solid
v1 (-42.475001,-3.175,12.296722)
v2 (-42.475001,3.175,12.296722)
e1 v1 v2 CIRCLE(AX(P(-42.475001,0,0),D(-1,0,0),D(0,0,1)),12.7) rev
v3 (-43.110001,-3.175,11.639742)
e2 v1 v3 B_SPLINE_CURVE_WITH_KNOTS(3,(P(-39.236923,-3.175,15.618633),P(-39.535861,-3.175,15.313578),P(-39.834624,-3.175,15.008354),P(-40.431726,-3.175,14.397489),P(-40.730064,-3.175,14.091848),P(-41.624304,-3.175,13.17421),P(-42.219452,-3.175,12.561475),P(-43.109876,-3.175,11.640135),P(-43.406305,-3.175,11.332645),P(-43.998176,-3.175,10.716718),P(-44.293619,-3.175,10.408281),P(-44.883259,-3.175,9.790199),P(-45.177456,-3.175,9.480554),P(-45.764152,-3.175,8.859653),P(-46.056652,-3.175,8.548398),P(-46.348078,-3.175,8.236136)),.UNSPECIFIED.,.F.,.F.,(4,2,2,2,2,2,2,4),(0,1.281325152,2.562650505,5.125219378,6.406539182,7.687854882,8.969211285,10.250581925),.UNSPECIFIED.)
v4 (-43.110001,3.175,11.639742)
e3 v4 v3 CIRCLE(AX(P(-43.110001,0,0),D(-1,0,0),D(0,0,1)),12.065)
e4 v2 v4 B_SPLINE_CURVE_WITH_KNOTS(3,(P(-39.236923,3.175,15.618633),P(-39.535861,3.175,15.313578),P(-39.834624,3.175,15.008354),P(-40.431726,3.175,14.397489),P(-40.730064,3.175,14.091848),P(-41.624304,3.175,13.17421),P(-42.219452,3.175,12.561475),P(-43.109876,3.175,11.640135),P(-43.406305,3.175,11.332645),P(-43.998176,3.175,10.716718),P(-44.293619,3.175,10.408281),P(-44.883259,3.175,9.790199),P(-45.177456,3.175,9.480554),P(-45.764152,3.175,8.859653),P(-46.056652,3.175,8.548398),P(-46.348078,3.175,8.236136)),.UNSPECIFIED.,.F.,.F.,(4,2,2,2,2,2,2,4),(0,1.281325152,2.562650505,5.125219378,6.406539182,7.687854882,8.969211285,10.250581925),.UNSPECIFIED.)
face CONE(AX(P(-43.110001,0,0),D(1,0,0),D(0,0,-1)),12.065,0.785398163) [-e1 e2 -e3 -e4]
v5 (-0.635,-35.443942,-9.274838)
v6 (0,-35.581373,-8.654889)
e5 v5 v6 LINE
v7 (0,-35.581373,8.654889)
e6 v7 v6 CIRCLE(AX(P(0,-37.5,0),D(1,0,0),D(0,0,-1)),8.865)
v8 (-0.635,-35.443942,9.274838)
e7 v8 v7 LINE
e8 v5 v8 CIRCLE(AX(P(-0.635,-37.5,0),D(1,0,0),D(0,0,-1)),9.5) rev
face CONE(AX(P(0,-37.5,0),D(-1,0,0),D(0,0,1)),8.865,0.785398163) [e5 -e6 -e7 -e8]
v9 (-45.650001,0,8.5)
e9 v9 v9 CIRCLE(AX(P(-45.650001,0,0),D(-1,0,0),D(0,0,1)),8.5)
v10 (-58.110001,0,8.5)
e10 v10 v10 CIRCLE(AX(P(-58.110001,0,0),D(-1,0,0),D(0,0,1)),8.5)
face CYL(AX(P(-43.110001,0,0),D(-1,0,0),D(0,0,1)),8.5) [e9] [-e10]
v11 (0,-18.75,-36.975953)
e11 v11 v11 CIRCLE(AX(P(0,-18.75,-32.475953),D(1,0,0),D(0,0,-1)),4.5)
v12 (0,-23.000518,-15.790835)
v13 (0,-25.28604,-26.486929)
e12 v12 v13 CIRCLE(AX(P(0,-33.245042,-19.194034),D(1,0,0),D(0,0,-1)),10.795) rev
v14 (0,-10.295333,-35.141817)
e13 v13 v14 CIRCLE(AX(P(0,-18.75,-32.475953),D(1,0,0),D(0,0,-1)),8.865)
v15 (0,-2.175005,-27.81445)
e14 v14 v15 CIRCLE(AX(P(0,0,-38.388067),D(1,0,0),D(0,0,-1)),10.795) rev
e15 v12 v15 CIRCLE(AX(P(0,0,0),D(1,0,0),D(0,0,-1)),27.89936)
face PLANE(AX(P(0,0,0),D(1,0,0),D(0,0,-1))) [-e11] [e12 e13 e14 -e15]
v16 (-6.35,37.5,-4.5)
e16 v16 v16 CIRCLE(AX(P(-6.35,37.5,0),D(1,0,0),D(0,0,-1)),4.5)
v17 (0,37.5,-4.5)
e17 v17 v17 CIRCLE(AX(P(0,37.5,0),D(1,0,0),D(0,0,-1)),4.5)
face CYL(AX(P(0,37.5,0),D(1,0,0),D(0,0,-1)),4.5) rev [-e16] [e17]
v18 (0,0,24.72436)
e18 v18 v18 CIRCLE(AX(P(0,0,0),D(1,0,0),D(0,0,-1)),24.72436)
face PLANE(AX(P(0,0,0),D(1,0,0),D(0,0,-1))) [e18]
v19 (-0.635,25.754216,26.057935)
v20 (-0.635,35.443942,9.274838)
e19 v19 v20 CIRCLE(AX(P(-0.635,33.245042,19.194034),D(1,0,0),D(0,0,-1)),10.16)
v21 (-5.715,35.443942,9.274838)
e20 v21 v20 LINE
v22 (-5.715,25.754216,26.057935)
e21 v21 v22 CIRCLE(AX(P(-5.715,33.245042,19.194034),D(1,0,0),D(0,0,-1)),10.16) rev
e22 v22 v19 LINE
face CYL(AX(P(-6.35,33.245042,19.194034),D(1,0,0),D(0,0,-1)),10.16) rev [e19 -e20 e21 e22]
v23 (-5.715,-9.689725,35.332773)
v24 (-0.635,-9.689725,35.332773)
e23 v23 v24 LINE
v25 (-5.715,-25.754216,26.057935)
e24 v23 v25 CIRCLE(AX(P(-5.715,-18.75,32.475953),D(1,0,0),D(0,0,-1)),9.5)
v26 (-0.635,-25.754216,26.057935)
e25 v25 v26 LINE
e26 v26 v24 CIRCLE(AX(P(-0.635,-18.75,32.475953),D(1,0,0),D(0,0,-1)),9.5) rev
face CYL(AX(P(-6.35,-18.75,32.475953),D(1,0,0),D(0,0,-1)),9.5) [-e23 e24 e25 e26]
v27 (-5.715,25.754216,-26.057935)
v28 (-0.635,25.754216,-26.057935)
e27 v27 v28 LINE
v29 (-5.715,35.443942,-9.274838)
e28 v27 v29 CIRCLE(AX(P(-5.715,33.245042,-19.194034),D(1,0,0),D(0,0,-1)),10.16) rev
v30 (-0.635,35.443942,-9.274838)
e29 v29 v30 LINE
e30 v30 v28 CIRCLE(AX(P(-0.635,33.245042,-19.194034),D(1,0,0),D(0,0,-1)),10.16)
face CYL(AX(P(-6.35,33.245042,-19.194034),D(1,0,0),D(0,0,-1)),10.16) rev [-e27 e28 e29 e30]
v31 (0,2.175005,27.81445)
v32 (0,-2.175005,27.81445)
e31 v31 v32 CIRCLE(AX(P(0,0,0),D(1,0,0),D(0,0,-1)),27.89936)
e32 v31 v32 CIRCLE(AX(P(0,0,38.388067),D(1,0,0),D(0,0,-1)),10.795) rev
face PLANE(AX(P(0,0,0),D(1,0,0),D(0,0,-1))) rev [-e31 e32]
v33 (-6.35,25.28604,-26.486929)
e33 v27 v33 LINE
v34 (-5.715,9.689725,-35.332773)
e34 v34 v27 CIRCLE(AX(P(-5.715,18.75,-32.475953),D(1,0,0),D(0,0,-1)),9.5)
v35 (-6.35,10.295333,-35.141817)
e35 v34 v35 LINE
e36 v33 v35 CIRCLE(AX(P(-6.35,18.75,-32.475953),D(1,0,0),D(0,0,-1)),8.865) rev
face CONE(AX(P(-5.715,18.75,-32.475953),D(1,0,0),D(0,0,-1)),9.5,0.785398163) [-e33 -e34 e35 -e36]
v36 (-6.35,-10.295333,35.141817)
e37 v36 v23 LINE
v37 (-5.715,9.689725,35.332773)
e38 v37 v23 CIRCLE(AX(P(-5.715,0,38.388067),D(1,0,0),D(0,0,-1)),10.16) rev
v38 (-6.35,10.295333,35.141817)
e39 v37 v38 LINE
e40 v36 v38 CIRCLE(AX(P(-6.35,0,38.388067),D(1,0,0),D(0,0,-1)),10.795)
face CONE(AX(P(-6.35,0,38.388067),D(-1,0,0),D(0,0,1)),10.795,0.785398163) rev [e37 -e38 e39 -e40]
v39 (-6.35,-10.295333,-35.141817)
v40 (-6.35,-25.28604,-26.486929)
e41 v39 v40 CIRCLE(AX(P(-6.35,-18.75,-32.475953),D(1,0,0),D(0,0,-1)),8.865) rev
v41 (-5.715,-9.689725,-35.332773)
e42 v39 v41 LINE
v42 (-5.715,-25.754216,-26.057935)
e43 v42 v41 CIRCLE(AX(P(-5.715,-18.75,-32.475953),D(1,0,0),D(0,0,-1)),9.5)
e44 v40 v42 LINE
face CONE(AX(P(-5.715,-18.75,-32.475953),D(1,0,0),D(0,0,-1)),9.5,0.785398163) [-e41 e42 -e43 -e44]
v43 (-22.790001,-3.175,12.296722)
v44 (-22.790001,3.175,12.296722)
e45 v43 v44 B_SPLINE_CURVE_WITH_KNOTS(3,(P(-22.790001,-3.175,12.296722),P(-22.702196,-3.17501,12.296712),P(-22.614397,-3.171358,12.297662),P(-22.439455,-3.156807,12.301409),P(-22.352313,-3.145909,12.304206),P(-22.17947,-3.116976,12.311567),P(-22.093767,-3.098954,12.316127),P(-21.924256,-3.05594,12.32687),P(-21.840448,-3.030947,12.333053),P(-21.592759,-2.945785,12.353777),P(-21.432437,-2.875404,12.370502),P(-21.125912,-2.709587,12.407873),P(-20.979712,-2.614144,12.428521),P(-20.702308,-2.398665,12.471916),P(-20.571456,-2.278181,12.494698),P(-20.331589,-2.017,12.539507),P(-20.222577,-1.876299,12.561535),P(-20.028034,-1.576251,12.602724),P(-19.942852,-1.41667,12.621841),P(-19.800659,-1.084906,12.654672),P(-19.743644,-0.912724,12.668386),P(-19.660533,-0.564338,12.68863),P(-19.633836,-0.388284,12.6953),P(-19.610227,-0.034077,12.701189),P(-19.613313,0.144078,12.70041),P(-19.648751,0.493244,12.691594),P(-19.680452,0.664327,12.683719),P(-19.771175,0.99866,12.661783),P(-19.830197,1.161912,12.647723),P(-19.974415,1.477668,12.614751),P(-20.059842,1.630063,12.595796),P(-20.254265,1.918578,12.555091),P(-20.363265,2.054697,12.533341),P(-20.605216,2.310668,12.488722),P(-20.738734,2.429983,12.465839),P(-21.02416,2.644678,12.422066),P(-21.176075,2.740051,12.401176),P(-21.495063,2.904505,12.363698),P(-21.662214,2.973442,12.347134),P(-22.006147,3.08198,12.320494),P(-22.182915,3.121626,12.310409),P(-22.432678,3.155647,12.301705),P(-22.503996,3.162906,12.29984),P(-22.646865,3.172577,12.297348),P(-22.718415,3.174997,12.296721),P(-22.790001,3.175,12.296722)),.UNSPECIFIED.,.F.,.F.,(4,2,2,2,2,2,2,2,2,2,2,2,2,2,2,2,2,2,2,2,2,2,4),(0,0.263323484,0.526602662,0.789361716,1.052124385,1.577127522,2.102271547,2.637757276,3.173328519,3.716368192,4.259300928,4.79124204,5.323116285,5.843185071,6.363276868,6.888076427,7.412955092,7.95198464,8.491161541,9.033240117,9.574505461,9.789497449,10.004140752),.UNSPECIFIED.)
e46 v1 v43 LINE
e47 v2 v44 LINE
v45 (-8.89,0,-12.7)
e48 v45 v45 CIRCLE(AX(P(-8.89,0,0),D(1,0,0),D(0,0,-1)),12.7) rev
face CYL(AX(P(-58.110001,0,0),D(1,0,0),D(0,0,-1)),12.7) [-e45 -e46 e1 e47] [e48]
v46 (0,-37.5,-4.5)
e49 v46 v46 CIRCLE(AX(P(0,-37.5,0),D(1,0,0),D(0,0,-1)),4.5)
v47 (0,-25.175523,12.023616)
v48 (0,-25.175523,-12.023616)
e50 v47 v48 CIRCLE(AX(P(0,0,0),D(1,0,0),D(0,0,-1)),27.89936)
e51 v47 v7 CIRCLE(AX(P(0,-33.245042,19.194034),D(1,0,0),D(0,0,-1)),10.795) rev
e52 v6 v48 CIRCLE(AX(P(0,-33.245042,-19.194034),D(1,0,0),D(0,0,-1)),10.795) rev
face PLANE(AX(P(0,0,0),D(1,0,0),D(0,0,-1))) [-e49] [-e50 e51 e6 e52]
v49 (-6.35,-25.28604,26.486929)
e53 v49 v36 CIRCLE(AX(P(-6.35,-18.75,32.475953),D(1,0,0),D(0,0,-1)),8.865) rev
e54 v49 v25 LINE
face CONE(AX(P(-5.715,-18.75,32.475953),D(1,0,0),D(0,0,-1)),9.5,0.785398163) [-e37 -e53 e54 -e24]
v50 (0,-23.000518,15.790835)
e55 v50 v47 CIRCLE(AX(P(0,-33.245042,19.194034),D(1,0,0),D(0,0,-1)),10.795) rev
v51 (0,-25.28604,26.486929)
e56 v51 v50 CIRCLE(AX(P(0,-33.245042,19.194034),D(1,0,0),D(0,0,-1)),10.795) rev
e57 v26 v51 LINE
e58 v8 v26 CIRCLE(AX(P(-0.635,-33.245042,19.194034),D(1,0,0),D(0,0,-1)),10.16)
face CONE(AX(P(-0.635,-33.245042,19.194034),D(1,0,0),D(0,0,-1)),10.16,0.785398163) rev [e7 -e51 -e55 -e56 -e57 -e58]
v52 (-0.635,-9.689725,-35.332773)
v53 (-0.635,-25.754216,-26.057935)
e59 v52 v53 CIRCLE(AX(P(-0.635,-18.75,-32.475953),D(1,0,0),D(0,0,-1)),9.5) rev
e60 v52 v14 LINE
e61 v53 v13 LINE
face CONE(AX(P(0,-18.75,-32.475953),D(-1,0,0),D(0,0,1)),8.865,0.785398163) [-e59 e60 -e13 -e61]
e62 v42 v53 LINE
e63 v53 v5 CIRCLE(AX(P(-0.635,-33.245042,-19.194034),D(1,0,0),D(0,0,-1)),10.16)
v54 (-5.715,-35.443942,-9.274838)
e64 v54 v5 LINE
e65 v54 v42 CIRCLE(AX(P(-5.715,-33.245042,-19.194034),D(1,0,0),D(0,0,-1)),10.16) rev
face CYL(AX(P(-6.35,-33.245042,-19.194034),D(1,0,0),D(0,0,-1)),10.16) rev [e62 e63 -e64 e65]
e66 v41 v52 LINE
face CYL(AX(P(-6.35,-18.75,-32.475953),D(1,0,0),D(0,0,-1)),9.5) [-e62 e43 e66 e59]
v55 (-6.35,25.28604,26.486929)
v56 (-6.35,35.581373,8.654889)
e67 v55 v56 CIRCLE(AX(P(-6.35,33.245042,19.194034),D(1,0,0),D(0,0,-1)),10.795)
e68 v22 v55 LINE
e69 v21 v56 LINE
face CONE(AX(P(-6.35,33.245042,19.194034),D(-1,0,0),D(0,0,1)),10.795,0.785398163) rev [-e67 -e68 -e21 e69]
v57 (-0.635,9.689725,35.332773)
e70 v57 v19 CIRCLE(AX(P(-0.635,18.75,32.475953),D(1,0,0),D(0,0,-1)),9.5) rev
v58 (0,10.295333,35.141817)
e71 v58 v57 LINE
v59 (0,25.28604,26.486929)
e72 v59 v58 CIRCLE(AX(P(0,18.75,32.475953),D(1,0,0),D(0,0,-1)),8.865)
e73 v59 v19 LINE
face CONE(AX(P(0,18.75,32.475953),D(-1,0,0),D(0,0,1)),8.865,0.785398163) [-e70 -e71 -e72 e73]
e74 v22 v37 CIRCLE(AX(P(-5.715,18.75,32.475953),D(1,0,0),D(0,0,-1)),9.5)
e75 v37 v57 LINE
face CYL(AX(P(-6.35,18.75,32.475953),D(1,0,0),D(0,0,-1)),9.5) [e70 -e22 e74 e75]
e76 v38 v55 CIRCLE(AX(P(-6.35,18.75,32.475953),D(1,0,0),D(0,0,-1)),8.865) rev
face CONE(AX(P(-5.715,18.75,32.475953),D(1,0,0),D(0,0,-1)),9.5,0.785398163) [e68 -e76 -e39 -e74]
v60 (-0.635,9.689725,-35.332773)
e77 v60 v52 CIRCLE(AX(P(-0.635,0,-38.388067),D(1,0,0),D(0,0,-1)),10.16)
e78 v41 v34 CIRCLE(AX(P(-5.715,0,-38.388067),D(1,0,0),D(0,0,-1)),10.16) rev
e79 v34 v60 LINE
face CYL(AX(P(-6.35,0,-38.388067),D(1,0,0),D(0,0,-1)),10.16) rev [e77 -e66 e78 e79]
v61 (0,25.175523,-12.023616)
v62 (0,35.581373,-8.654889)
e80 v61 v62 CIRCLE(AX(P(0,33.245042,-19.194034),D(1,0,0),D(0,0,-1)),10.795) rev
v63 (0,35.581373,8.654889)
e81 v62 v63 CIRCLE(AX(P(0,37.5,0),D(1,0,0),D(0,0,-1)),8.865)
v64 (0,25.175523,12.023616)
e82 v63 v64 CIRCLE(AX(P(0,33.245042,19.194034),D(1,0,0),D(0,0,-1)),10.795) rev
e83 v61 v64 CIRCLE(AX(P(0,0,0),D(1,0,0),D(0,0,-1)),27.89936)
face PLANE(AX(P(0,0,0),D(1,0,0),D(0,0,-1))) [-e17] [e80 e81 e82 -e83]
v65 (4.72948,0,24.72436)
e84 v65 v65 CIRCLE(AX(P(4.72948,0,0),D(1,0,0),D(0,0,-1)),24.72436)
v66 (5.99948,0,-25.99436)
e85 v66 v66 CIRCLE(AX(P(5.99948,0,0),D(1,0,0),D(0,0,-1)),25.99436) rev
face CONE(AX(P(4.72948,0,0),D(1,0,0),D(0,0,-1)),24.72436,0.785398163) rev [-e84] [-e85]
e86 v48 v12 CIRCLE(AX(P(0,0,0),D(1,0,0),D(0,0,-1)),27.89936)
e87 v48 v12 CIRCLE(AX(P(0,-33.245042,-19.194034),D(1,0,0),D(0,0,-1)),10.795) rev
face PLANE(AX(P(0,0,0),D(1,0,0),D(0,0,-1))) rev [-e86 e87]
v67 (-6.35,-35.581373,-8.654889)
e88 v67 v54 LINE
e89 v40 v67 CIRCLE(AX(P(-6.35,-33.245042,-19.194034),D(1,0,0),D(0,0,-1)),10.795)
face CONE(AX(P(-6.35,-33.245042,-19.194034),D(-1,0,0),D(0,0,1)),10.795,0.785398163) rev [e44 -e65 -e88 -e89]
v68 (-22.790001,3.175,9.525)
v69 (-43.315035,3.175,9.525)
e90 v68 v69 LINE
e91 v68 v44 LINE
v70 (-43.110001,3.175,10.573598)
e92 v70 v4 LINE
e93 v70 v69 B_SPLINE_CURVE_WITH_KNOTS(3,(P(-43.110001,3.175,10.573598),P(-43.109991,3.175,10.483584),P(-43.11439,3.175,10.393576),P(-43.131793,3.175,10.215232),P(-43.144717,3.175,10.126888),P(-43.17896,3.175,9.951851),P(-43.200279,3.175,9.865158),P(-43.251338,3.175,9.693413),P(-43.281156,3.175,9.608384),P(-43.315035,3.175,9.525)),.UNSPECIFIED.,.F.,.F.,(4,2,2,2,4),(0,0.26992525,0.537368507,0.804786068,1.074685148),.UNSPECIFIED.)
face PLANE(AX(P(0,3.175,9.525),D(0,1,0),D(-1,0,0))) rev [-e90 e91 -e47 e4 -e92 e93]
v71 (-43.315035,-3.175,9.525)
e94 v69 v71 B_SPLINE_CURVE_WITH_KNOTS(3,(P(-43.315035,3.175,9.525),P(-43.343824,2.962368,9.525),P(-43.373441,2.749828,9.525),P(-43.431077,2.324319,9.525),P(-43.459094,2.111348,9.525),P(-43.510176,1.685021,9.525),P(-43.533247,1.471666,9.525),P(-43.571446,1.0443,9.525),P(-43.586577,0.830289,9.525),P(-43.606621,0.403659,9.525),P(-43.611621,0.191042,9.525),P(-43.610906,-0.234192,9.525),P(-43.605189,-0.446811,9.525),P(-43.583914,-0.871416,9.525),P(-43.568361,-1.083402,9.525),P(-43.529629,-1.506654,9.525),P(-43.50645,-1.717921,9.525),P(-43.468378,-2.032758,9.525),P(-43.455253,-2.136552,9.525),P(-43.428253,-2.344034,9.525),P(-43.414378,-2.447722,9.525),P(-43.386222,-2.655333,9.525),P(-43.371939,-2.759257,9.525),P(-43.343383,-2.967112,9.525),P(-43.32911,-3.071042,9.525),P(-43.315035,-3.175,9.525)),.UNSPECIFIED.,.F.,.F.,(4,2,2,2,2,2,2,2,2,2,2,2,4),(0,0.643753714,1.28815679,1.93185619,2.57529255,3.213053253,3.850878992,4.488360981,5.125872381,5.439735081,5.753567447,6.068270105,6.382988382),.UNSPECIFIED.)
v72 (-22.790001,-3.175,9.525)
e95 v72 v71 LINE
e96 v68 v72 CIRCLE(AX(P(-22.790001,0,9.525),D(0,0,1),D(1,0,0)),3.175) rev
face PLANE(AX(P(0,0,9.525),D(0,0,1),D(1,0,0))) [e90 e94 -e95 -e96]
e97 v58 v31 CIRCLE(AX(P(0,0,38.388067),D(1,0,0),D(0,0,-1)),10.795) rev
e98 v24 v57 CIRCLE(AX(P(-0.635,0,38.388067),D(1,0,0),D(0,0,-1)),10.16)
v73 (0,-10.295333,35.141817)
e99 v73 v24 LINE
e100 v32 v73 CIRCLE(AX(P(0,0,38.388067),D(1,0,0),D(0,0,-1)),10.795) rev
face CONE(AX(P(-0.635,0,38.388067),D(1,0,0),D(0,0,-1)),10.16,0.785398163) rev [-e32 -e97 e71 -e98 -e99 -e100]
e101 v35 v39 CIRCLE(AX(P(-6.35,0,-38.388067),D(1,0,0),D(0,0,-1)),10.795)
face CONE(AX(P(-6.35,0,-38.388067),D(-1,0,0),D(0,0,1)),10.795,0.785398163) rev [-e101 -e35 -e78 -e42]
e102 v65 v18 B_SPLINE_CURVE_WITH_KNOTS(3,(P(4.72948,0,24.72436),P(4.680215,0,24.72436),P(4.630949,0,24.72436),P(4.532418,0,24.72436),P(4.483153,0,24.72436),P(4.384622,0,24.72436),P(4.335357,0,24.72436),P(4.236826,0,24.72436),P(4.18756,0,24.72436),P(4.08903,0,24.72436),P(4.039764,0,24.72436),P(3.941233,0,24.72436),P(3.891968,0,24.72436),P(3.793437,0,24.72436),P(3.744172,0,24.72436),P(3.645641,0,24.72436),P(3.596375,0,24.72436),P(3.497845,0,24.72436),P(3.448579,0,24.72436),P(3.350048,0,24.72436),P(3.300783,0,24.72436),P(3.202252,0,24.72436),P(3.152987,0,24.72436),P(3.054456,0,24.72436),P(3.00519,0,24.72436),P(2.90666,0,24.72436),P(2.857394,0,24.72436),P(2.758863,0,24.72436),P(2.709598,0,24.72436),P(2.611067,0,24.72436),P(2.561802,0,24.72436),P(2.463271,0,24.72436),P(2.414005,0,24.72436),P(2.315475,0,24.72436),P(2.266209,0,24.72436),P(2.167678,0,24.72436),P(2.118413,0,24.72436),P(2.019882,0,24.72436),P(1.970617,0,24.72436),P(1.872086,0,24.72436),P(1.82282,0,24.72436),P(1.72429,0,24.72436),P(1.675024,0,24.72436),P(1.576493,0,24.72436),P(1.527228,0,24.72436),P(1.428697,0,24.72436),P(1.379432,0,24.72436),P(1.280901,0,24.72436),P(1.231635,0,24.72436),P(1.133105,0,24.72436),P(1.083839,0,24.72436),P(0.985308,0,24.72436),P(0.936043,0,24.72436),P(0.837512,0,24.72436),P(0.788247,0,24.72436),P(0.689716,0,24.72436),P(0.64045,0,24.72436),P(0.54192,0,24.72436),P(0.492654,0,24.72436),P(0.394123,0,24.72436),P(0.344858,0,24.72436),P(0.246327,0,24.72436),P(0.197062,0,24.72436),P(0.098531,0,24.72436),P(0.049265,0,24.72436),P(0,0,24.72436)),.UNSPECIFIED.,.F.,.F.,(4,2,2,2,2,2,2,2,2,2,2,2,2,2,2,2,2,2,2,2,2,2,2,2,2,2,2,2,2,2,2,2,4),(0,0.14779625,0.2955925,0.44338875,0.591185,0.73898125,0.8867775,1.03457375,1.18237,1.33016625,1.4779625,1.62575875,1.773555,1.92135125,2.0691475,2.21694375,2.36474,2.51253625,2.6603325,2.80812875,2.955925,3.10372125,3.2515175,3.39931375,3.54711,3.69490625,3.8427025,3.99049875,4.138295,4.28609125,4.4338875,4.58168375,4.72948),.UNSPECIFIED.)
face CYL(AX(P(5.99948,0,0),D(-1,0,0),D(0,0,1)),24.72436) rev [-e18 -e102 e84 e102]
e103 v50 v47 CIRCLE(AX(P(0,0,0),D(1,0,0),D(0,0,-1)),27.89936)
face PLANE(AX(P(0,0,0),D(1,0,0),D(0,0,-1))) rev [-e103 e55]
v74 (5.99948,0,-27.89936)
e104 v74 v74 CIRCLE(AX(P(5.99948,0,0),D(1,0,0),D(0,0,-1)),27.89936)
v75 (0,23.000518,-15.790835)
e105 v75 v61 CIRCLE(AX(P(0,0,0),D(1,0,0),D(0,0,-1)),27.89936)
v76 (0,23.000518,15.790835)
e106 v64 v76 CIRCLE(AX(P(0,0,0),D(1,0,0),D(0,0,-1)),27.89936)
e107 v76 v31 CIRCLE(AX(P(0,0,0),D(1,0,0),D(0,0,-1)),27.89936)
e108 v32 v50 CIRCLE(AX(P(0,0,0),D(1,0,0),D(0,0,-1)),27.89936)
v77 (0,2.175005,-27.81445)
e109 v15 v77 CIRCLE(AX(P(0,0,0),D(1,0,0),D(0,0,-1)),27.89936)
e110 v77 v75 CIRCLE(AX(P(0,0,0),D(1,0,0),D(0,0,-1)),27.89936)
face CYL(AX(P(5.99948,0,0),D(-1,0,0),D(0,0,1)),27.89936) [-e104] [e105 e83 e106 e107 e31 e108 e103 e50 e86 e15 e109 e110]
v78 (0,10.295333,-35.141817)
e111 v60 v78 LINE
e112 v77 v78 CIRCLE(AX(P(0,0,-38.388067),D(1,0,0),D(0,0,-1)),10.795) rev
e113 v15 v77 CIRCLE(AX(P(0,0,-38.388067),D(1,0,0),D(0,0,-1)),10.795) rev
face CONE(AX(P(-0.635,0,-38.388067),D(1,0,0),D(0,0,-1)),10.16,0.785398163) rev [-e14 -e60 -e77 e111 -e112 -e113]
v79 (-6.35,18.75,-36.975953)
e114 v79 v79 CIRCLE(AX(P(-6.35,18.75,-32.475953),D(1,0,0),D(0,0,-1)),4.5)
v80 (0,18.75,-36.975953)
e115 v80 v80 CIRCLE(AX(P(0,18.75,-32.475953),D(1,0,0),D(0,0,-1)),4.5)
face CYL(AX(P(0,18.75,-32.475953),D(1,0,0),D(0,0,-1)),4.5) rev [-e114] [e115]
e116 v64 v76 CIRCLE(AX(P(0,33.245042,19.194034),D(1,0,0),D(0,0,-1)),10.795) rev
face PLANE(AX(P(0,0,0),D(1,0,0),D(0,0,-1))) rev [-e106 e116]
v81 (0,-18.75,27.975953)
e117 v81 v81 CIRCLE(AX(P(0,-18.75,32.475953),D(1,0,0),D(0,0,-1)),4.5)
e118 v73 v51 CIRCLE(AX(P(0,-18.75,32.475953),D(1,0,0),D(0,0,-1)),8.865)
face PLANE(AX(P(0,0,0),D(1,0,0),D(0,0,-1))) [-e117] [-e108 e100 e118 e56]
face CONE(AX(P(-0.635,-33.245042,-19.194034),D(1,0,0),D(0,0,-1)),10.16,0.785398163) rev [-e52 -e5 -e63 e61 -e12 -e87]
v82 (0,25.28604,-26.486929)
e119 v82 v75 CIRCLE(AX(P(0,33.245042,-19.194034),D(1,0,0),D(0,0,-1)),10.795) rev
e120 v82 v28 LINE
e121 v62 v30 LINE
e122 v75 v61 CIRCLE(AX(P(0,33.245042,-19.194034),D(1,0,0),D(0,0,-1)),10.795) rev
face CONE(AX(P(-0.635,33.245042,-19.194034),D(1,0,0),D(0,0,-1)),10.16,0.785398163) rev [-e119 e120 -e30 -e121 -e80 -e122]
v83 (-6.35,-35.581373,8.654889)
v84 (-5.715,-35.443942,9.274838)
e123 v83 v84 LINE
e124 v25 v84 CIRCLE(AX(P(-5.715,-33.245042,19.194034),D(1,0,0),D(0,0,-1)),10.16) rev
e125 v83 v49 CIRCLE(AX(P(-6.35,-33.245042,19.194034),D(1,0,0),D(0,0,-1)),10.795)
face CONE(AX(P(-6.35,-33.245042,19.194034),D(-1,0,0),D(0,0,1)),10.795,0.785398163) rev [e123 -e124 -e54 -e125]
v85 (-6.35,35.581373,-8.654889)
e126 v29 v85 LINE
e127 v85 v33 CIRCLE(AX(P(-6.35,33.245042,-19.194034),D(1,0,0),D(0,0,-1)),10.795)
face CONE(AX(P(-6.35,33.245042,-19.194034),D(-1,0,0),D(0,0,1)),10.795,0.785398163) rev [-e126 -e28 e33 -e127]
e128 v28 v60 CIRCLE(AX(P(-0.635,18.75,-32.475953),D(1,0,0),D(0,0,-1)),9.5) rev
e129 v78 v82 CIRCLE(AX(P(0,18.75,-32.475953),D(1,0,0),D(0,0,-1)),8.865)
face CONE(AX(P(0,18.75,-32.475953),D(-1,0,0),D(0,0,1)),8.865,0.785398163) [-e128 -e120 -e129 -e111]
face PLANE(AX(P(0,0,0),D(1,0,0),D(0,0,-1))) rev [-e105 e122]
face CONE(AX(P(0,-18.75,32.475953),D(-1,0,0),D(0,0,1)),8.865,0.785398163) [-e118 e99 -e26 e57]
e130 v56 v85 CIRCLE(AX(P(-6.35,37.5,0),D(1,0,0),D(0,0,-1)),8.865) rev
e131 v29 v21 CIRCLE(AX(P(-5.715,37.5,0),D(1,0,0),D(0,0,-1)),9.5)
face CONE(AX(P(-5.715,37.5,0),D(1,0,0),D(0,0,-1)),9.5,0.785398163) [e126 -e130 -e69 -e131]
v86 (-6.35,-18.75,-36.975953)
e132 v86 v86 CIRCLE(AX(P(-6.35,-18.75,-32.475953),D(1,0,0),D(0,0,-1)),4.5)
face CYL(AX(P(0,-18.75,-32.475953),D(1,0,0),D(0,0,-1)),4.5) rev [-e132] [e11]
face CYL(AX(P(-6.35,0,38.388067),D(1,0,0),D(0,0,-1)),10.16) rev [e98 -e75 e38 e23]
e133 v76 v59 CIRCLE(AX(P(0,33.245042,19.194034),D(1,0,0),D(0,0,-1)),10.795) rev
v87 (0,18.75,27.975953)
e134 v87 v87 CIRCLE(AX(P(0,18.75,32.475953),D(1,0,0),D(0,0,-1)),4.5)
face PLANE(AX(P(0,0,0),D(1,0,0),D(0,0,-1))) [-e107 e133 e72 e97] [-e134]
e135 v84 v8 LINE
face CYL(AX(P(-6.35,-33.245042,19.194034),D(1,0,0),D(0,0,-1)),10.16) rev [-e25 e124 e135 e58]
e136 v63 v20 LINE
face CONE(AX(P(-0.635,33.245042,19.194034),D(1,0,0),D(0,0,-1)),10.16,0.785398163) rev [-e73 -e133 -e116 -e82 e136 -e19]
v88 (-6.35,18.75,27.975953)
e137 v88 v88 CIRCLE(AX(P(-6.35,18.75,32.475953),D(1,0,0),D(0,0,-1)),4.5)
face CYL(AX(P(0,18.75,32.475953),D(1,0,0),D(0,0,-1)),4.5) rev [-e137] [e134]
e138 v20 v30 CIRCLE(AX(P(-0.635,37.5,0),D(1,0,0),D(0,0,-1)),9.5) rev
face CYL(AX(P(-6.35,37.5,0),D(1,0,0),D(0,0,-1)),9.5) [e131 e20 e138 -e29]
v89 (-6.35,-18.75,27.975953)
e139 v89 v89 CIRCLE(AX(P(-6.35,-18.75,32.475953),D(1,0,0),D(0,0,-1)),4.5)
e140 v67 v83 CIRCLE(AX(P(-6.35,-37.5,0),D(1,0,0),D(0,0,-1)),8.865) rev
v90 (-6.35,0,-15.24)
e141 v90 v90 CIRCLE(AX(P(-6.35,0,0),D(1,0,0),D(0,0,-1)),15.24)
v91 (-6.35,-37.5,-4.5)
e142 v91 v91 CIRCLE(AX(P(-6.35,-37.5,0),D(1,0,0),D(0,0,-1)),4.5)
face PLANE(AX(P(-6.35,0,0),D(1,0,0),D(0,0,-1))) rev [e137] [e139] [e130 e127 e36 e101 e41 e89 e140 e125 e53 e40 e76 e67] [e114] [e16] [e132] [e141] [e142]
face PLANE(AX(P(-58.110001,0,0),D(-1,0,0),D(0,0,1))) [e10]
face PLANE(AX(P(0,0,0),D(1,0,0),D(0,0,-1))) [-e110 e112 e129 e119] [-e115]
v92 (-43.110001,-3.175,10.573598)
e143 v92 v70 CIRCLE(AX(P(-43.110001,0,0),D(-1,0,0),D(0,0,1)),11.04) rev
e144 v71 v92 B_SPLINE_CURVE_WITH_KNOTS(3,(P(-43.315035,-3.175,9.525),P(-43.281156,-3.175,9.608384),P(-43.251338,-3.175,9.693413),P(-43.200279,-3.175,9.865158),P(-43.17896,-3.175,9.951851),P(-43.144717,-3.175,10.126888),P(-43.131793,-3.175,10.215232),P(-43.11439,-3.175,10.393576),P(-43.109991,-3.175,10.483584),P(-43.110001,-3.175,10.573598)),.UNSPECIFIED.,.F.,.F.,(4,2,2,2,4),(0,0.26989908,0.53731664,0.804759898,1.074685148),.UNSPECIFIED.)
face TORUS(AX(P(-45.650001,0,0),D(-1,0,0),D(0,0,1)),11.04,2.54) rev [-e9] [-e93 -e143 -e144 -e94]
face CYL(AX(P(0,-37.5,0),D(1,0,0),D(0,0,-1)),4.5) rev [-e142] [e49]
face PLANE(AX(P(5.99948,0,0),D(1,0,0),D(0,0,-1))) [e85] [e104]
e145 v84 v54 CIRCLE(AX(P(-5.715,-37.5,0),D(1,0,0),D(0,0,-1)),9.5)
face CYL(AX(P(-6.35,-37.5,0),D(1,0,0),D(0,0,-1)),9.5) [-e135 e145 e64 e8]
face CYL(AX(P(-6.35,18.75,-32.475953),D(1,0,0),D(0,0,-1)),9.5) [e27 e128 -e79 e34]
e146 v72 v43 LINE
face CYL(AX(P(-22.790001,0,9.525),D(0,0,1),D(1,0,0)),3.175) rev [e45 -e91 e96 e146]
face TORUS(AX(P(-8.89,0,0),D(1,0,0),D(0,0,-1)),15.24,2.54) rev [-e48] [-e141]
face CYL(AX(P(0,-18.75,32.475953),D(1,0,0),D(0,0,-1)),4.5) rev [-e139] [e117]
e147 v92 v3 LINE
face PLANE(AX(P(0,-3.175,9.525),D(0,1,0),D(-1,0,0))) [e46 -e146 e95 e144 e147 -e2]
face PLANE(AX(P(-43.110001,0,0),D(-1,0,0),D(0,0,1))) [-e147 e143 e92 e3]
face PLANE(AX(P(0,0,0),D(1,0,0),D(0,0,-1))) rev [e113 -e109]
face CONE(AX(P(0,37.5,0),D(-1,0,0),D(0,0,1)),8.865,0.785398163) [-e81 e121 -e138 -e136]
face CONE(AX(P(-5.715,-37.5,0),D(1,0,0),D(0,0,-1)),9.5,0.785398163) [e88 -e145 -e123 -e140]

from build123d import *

# Parameters (mm, degrees)
SKETCH1_R              = 47
BASE_EXTRUDE_DEPTH     = 6.35
M8_CLEARANCE_HOLES_D   = 9
CIRPATTERN_COUNT       = 6
CUT_EXTRUDE_DEPTH      = 67.770670957
CUT_EXTRUDE_DEPTH_BACK = 67.770670957
CHAMFER1_SIZE          = 0.635
SKETCH8_R              = 12.7
SHAFT_EXTRUDE_DEPTH    = 51.76000062
CHAMFER3_SIZE          = 0.635
SHAFT_CHAMFER_SIZE     = 1
SKETCH30_R             = 27.89936
SKETCH30_R_2           = 24.72436
LIP_EXTRUDE_DEPTH      = 5.99948
LIP_CHAMFER_SIZE       = 1.27
CUT_EXTRUDE1_START     = -15
SKETCH45_R             = 12.7
SKETCH45_R_2           = 8.5
CUT_EXTRUDE1_DEPTH     = 15
CHAMFER4_SIZE          = 0.635
FILLET2_R              = 2.54
CUT_EXTRUDE3_DEPTH     = 3.175
FILLET3_R              = 2.54


with BuildPart() as part:
    # Sketch1 → Base-Extrude (new body)
    with BuildSketch(Plane(origin=(0, 0, 0), x_dir=(0, 0, -1), z_dir=(1, 0, 0))):
        Circle(SKETCH1_R)
    extrude(amount=-BASE_EXTRUDE_DEPTH)

    # M8 Clearance Holes (through all)
    with Locations(Plane(origin=(0, 0, 0), x_dir=(0, 0, -1), z_dir=(1, 0, 0))):
        with Locations((0, -37.5)):
            m8_clearance_holes = Hole(M8_CLEARANCE_HOLES_D / 2)

    # CirPattern: M8 Clearance Holes ×6 about axis
    cirpattern_axis = Axis((0, 0, 0), (1, 0, 0))
    for i in range(1, CIRPATTERN_COUNT):
        add(m8_clearance_holes.rotate(cirpattern_axis, i * 360 / CIRPATTERN_COUNT), mode=Mode.SUBTRACT)

    # Sketch19 → Cut-Extrude (cut, two sides: drawn at the far end of the back side and taken through both)
    with BuildSketch(Plane(origin=(0, 0, 0), x_dir=(0, 0, -1), z_dir=(1, 0, 0)).offset(-CUT_EXTRUDE_DEPTH_BACK)):
        with BuildLine():
            ThreePointArc((9.274838239, 35.443941724), (14.114033661, 24.446223401), (26.057934823, 25.754216393))
            ThreePointArc((26.057934823, 25.754216393), (33.921184851, 28.139425108), (40.703194264, 23.499999504))
            ThreePointArc((40.703194264, 23.499999504), (23.500000227, 40.703193847), (-4.7e-08, 47))
            ThreePointArc((-4.7e-08, 47), (7.40886473, 43.446320157), (9.274838239, 35.443941724))
        make_face()
        with BuildLine():
            ThreePointArc((-26.057934823, 25.754216393), (-14.114033661, 24.446223401), (-9.274838239, 35.443941724))
            ThreePointArc((-9.274838239, 35.443941724), (-7.40886476, 43.44632012), (-4.7e-08, 47))
            ThreePointArc((-4.7e-08, 47), (-23.500000787, 40.703193523), (-40.703194863, 23.499998466))
            ThreePointArc((-40.703194863, 23.499998466), (-33.921185443, 28.139425017), (-26.057934823, 25.754216393))
        make_face()
        with BuildLine():
            ThreePointArc((40.703193464, -23.50000089), (47, -8e-07), (40.703194264, 23.499999504))
            ThreePointArc((40.703194264, 23.499999504), (41.33004921, 15.30689472), (35.332773062, 9.689725331))
            ThreePointArc((35.332773062, 9.689725331), (28.228067323, 0), (35.332773062, -9.689725331))
            ThreePointArc((35.332773062, -9.689725331), (41.330049499, -15.306895465), (40.703193464, -23.50000089))
        make_face()
        with BuildLine():
            ThreePointArc((-35.332773062, 9.689725331), (-41.330048992, 15.306894161), (-40.703194863, 23.499998466))
            ThreePointArc((-40.703194863, 23.499998466), (-47, -6.9e-08), (-40.703194794, -23.499998586))
            ThreePointArc((-40.703194794, -23.499998586), (-41.330049018, -15.306894226), (-35.332773062, -9.689725331))
            ThreePointArc((-35.332773062, -9.689725331), (-28.228067323, 0), (-35.332773062, 9.689725331))
        make_face()
        with BuildLine():
            ThreePointArc((-26.057934823, -25.754216393), (-33.921185375, -28.139425028), (-40.703194794, -23.499998586))
            ThreePointArc((-40.703194794, -23.499998586), (-23.500000688, -40.703193581), (4.4e-08, -47))
            ThreePointArc((4.4e-08, -47), (-7.408864732, -43.446320155), (-9.274838239, -35.443941724))
            ThreePointArc((-9.274838239, -35.443941724), (-14.114033661, -24.446223401), (-26.057934823, -25.754216393))
        make_face()
        with BuildLine():
            ThreePointArc((4.4e-08, -47), (23.499999574, -40.703194224), (40.703193464, -23.50000089))
            ThreePointArc((40.703193464, -23.50000089), (33.92118406, -28.13942523), (26.057934823, -25.754216393))
            ThreePointArc((26.057934823, -25.754216393), (14.114033661, -24.446223401), (9.274838239, -35.443941724))
            ThreePointArc((9.274838239, -35.443941724), (7.408864759, -43.446320121), (4.4e-08, -47))
        make_face()
    extrude(amount=CUT_EXTRUDE_DEPTH + CUT_EXTRUDE_DEPTH_BACK, mode=Mode.SUBTRACT)

    # Chamfer1
    chamfer1_edges = [part.edges().sort_by_distance(p)[0] for p in [
        (-6.35, -24.446223401, 14.114033661),
        (-6.35, 24.446223401, -14.114033661),
        (-6.35, 24.446223401, 14.114033661),
        (-6.35, 23.5, 40.703193978),
        (-6.35, 47, 0),
        (-6.35, -24.446223401, -14.114033661),
        (-6.35, -23.5, -40.703193978),
        (-6.35, -47, 0),
        (-6.35, 0, 28.228067323),
        (-6.35, -23.5, 40.703193978),
        (-6.35, 0, -28.228067323),
        (-6.35, 23.5, -40.703193978),
    ]]
    chamfer(chamfer1_edges, length=CHAMFER1_SIZE)

    # Sketch8 → Shaft-Extrude (add)
    with BuildSketch(Plane.ZY.offset(6.35)):
        with Locations(Location((0, 0, 0), (0, 0, 180))):
            Circle(SKETCH8_R)
    extrude(amount=SHAFT_EXTRUDE_DEPTH)

    # Chamfer3
    chamfer3_edges = [part.edges().sort_by_distance(p)[0] for p in [
        (0, 24.446223401, -14.114033661),
        (0, -24.446223401, 14.114033661),
        (0, -24.446223401, -14.114033661),
        (0, -47, 0),
        (0, -23.5, -40.703193978),
        (0, 24.446223401, 14.114033661),
        (0, 47, 0),
        (0, 23.5, 40.703193978),
        (0, 0, -28.228067323),
        (0, 23.5, -40.703193978),
        (0, 0, 28.228067323),
        (0, -23.5, 40.703193978),
    ]]
    chamfer(chamfer3_edges, length=CHAMFER3_SIZE)

    # Shaft Chamfer
    shaft_chamfer_edges = [part.edges().sort_by_distance(p)[0] for p in [
        (-58.11000062, 0, 12.7),
    ]]
    chamfer(shaft_chamfer_edges, length=SHAFT_CHAMFER_SIZE)

    # Sketch30 → Lip Extrude (add)
    with BuildSketch(Plane(origin=(0, 0, 0), x_dir=(0, 0, -1), z_dir=(1, 0, 0))):
        with Locations(Location((0, 0, 0), (0, 0, 175.528743947))):
            Circle(SKETCH30_R)
        with Locations(Location((0, 0, 0), (0, 0, 180))):
            Circle(SKETCH30_R_2, mode=Mode.SUBTRACT)
    extrude(amount=LIP_EXTRUDE_DEPTH)

    # Lip Chamfer
    lip_chamfer_edges = [part.edges().sort_by_distance(p)[0] for p in [
        (5.99948, 0, -24.72436),
    ]]
    chamfer(lip_chamfer_edges, length=LIP_CHAMFER_SIZE)

    # Sketch45 → Cut-Extrude1 (cut)
    with BuildSketch(Plane.ZY.offset(58.11000062).offset(CUT_EXTRUDE1_START)):
        with Locations(Location((0, 0, 0), (0, 0, 180))):
            Circle(SKETCH45_R)
        Circle(SKETCH45_R_2, mode=Mode.SUBTRACT)
    extrude(amount=CUT_EXTRUDE1_DEPTH, mode=Mode.SUBTRACT)

    # Chamfer4
    chamfer4_edges = [part.edges().sort_by_distance(p)[0] for p in [
        (-43.11000062, 0, 12.7),
    ]]
    chamfer(chamfer4_edges, length=CHAMFER4_SIZE)

    # Fillet2
    fillet2_edges = [part.edges().sort_by_distance(p)[0] for p in [
        (-6.35, 0, 12.7),
    ]]
    fillet(fillet2_edges, radius=FILLET2_R)

    # Sketch48 → Cut-Extrude3 (cut)
    with BuildSketch(Plane.XY.offset(12.7)):
        with BuildLine():
            ThreePointArc((-19.61500062, 0), (-20.54493659, 2.24506403), (-22.79000062, 3.175))
            Line((-22.79000062, 3.175), (-43.11000062, 3.175))
            Line((-43.11000062, 3.175), (-43.11000062, 0))
            Line((-43.11000062, 0), (-19.61500062, 0))
        make_face()
        with BuildLine():
            ThreePointArc((-22.79000062, -3.175), (-20.54493659, -2.24506403), (-19.61500062, 0))
            Line((-19.61500062, 0), (-43.11000062, 0))
            Line((-43.11000062, 0), (-43.11000062, -3.175))
            Line((-43.11000062, -3.175), (-22.79000062, -3.175))
        make_face()
    extrude(amount=-CUT_EXTRUDE3_DEPTH, mode=Mode.SUBTRACT)

    # Fillet3
    # the kernel refuses this fillet: 2.54 mm, written as the material it adds along each edge
    with BuildSketch(Plane(origin=(-43.11000062, 0, 0), x_dir=(0, 0, 1), z_dir=(0, -1, 0))) as fillet3_piece_1_section:
        with BuildLine():
            CenterArc((8.5 + FILLET3_R, FILLET3_R), FILLET3_R, 180, 90)
            Line((8.5, FILLET3_R), (8.5, 0))
            Line((8.5, 0), (8.5 + FILLET3_R, 0))
        make_face()
    fillet3_piece_1 = revolve(axis=Axis((-43.11000062, 0, 0), (-1, 0, 0)), mode=Mode.PRIVATE)
    fillet3_piece_1 = split(fillet3_piece_1, bisect_by=Plane(origin=(-43.740743276, 3.41e-07, 9.525), z_dir=(0, 0, -1)), keep=Keep.TOP, mode=Mode.PRIVATE)
    add(fillet3_piece_1)
    with BuildSketch(Plane(origin=(-43.11000062, 0, 0), x_dir=(0, 0, 1), z_dir=(0, -1, 0))) as fillet3_piece_2_section:
        with BuildLine():
            CenterArc((8.5 + FILLET3_R, FILLET3_R), FILLET3_R, 180, 90)
            Line((8.5, FILLET3_R), (8.5, 0))
            Line((8.5, 0), (8.5 + FILLET3_R, 0))
        make_face()
    fillet3_piece_2 = revolve(axis=Axis((-43.11000062, 0, 0), (-1, 0, 0)), mode=Mode.PRIVATE)
    fillet3_piece_2 = split(fillet3_piece_2, bisect_by=Plane(origin=(-43.151597018, 3.175, 9.740498965), z_dir=(0, 1, 0)), keep=Keep.TOP, mode=Mode.PRIVATE)
    add(fillet3_piece_2)
    with BuildSketch(Plane(origin=(-43.11000062, 0, 0), x_dir=(0, 0, 1), z_dir=(0, -1, 0))) as fillet3_piece_3_section:
        with BuildLine():
            CenterArc((8.5 + FILLET3_R, FILLET3_R), FILLET3_R, 180, 90)
            Line((8.5, FILLET3_R), (8.5, 0))
            Line((8.5, 0), (8.5 + FILLET3_R, 0))
        make_face()
    fillet3_piece_3 = revolve(axis=Axis((-43.11000062, 0, 0), (-1, 0, 0)), mode=Mode.PRIVATE)
    fillet3_piece_3 = split(fillet3_piece_3, bisect_by=Plane(origin=(-43.151597018, -3.175, 9.740498965), z_dir=(0, -1, 0)), keep=Keep.TOP, mode=Mode.PRIVATE)
    add(fillet3_piece_3)


solid = part.part
